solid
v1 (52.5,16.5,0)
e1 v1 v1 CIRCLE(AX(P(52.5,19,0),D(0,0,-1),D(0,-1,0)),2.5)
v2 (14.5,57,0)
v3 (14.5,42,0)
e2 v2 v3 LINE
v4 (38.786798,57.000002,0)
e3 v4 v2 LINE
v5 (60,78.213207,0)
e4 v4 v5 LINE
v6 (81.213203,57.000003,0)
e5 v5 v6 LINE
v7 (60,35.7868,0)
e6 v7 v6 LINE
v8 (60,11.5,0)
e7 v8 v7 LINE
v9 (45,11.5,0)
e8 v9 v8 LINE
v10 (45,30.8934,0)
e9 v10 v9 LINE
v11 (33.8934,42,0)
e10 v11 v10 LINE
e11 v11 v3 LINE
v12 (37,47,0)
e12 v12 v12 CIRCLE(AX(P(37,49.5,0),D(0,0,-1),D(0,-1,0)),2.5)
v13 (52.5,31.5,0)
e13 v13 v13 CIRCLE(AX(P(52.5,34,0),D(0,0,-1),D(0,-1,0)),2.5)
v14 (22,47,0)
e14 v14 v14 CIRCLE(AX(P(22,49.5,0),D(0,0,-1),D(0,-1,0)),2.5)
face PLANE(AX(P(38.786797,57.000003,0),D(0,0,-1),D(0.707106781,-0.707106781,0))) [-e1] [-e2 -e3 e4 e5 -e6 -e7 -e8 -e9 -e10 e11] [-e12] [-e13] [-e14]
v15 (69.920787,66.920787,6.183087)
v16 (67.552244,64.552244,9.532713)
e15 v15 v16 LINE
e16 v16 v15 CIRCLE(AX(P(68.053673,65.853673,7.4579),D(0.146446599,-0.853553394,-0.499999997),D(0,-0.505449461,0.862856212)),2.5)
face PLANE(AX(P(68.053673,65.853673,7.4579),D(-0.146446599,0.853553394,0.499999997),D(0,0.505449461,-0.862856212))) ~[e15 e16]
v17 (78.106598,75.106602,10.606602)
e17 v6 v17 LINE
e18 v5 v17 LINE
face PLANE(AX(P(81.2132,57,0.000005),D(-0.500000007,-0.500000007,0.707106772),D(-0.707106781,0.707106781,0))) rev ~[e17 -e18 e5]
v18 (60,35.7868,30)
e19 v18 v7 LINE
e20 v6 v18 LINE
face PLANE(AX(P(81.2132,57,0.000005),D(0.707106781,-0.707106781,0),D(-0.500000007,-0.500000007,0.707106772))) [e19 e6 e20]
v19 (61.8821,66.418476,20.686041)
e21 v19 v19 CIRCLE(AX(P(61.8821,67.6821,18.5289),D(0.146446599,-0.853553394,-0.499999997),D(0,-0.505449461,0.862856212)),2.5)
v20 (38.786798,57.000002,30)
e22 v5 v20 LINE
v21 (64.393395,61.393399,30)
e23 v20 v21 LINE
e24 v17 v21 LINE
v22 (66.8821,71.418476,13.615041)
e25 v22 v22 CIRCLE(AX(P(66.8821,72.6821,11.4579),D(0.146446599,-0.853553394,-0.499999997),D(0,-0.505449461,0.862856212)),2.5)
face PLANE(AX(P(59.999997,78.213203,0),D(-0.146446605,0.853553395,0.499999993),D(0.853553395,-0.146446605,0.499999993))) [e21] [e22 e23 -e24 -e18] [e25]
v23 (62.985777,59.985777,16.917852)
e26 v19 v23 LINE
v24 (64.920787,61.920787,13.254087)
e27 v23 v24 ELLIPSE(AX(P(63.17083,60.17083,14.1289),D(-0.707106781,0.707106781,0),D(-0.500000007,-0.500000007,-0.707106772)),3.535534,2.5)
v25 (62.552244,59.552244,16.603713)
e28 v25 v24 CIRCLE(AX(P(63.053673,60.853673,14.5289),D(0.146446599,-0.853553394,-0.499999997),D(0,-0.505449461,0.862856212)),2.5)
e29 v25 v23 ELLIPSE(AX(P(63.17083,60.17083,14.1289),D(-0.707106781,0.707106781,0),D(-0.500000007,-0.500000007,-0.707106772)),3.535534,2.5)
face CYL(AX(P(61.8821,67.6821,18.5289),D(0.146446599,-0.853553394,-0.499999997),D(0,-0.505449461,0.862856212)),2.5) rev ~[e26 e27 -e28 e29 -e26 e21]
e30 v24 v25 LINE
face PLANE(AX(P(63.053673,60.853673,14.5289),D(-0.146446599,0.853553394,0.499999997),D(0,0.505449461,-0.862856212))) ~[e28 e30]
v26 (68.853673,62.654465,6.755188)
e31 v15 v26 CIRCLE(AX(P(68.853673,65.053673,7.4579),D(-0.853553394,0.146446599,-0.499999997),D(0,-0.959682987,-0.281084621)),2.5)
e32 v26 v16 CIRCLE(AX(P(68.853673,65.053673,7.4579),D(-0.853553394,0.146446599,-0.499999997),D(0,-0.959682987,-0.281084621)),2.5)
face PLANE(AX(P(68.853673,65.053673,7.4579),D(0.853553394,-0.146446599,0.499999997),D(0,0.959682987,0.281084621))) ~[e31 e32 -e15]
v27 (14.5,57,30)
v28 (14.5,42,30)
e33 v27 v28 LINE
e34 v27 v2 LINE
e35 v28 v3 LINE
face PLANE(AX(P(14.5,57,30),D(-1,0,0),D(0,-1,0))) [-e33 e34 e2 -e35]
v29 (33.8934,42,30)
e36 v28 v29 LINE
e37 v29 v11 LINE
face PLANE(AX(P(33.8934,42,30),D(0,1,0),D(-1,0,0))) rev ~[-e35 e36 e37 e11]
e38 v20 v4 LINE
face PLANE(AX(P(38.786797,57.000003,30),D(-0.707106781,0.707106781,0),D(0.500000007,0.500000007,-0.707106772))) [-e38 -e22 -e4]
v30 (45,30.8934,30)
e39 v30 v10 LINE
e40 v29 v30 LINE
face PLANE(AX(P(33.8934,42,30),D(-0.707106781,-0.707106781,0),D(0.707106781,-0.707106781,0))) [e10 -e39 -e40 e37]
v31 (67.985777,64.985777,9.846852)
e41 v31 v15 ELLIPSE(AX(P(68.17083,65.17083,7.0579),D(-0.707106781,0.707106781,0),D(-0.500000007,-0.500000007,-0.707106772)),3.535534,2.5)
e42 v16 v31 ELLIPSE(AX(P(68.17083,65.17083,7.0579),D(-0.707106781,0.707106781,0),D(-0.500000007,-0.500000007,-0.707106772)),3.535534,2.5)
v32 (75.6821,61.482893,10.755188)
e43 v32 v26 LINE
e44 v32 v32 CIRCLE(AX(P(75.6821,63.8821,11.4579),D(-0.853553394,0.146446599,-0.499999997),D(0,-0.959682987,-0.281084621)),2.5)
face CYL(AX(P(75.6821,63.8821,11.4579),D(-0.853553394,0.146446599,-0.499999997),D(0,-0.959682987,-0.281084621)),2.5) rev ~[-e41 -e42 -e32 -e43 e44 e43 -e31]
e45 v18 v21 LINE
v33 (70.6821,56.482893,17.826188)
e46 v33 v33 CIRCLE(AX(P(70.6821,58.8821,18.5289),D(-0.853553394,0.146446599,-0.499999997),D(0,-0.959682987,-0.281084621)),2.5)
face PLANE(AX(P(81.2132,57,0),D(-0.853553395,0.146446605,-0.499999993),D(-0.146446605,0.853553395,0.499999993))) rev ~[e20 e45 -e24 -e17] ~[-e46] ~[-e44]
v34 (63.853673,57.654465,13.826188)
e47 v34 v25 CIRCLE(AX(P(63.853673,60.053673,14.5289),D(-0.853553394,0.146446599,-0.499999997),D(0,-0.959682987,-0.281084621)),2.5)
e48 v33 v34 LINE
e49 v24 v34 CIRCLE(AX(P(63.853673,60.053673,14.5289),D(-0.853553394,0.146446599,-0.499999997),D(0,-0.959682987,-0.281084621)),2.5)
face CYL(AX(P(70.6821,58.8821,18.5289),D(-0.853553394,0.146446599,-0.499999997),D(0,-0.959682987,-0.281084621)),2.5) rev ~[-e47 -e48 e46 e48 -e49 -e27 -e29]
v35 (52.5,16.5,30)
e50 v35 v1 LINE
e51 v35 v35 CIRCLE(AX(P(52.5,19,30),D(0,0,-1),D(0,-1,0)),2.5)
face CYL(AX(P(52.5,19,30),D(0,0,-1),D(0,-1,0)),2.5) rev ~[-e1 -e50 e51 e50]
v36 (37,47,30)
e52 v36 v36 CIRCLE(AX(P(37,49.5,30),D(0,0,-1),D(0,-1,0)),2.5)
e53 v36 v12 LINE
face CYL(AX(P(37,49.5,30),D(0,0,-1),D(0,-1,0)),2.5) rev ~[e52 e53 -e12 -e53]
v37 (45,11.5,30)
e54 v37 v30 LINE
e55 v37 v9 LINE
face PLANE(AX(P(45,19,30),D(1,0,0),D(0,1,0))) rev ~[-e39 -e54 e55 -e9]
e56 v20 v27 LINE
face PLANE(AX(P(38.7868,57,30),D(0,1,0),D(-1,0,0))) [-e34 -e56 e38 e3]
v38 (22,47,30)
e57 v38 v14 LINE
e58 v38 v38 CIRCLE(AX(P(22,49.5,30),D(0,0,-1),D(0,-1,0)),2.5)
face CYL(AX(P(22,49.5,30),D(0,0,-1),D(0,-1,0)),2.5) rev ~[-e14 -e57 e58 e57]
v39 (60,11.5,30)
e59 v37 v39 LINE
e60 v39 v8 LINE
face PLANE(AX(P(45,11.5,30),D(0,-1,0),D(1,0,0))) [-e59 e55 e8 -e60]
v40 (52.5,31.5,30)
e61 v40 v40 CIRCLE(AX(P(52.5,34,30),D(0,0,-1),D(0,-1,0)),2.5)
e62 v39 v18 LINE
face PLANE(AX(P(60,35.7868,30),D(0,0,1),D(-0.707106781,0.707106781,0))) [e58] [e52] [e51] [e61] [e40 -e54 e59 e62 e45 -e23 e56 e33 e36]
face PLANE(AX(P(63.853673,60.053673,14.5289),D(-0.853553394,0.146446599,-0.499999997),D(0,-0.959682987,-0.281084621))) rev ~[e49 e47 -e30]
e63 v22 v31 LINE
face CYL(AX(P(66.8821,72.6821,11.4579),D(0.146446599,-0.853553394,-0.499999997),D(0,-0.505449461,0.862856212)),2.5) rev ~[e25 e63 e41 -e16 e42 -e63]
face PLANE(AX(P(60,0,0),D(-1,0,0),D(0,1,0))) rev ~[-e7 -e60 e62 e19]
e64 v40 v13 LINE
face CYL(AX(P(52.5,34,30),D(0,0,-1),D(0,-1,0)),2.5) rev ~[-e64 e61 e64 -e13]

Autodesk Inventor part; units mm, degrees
ref_plane "YZ Plane" through (0, 0, 0) normal (1, 0, 0) x (0, 1, 0)
ref_plane "XZ Plane" through (0, 0, 0) normal (0, 1, 0) x (-1, 0, 0)
ref_plane "XY Plane" through (0, 0, 0) normal (0, 0, 1) x (1, 0, 0)
sketch "スケッチ1" plane through (0, 0, 0) normal (0, 0, 1) x (1, 0, 0)
  line L0 (0, 0) -> (60, 0)
  line L1 (60, 0) -> (60, 60)
  line L2 (60, 60) -> (0, 60)
  line L3 (0, 60) -> (0, 0)
  dimension "d0" = 60
  dimension "d1" = 60
extrude "押し出し1" add sketch "スケッチ1" along normal blind 30
sketch "スケッチ2" plane through (0, 0, 30) normal (0, 0, 1) x (1, 0, 0)
  line L0 (60, 0) -> (60, 60) projected
  line L1 (60, 60) -> (0, 60) projected
  point P0 (0, 0)
  point P1 (22, 49.5)
  point P2 (37, 49.5)
  point P3 (52.5, 34)
  point P4 (52.5, 19)
  dimension "d4" = 7.5
  dimension "d5" = 7.5
  dimension "d6" = 10.5
  dimension "d7" = 10.5
  dimension "d8" = 15
  dimension "d9" = 15
  dimension "d10" = 23
  dimension "d11" = 26
hole "穴1" at (22, 49.5, 30) at (37, 49.5, 30) at (52.5, 34, 30) at (52.5, 19, 30) direction (0, 0, -1) diameter 5 end through all
sketch "スケッチ3" plane through (0, 0, 30) normal (0, 0, 1) x (1, 0, 0)
  line L0 (22, 49.5) -> (37, 49.5)
  circle A0 centre (52.5, 34) radius 2.5 projected
  line L1 (37, 49.5) -> (52.5, 34)
  line L2 (52.5, 34) -> (52.5, 19)
  line L3 (22, 49.5) -> (22, 19)
  line L4 (22, 19) -> (52.5, 19)
  line L5 (60, 37.1066) -> (40.1066, 57)
  line L6 (40.1066, 57) -> (14.5, 57)
  line L7 (14.5, 57) -> (14.5, 11.5)
  line L8 (14.5, 11.5) -> (60, 11.5)
  line L9 (60, 11.5) -> (60, 37.1066)
  line L10 (14.5, 57) -> (44.5, 57)
  line L11 (44.5, 57) -> (44.5, 42)
  line L12 (44.5, 42) -> (14.5, 42)
  line L13 (14.5, 42) -> (14.5, 57)
  line L14 (60, 11.5) -> (45, 11.5)
  line L15 (45, 11.5) -> (45, 41.5)
  line L16 (45, 41.5) -> (60, 41.5)
  line L17 (60, 41.5) -> (60, 11.5)
  circle A1 centre (52.5, 19) radius 2.5 projected
  circle A2 centre (52.5, 34) radius 2.5 projected
  circle A3 centre (37, 49.5) radius 2.5 projected
  circle A4 centre (22, 49.5) radius 2.5 projected
  line L18 (60, 0) -> (60, 60) projected
  line L19 (60, 60) -> (0, 60) projected
  line L20 (0, 60) -> (0, 0) projected
  line L21 (0, 0) -> (60, 0) projected
  line L22 (14.5, 42) -> (45, 11.5)
  line L23 (24.0029, 51.8905) -> (54.5029, 21.3905)
  line L24 (38.7868, 57) -> (60, 35.7868)
  point P0 (52.5, 26.5)
  point P1 (45, 19)
  point P2 (22, 42)
  point P3 (39.2529, 36.6405)
  point P4 (45, 30.8934)
  point P5 (33.8934, 42)
  dimension "d19" = 7.5
  dimension "d20" = 7.5
  dimension "d21" = 7.5
  dimension "d22" = 30
  dimension "d23" = 30
  dimension "d50" = 7.5
  dimension "d52" = 30
extrude "押し出し2" cut sketch "スケッチ3" against normal blind 30 contours L12 L23 L15 L4 L22 L3 | L3 L22 L12 | L22 L4 L3 | L3 L4 L22 L8 L7 | L7 L8 L18 L21 L20 L19 L16 L5 L11 L10 L6 | L4 L15 L22 | L24 L6 L5 L11 | L11 L5 L16 L24 | L16 L5 L9 L24 | L5 L10 L11 | L16 L17 L5
sketch "スケッチ15" plane through (60, 35.7868, 0) normal (0.7071068, 0.7071068, 0) x (-0.7071068, 0.7071068, 0)
  line L0 (0, 30) -> (30, 30) projected
  line L1 (0, 0) -> (0, 30) projected
  line L2 (30, 0) -> (0, 0) projected
  line L3 (30, 30) -> (30, 0) projected
  point P0 (17.1213, 0)
extrude "押し出し11" add sketch "スケッチ15" along normal blind 30
sketch "スケッチ16" plane through (60, 35.7868, 30) normal (0.7071068, -0.7071068, 0) x (-0.7071068, -0.7071068, 0)
  line L0 (0, 30) -> (0, 0) projected
  line L1 (0, 30) -> (-30, 30) projected
  line L2 (-30, 0) -> (-30, 30) projected
  line L3 (0, 0) -> (-30, 0) projected
  line L4 (0, 0) -> (-30, 30)
  point P0 (67.7315, 30)
extrude "押し出し12" cut sketch "スケッチ16" against normal blind 30 contours L3 L2 L4
sketch "スケッチ18" plane through (60, 35.7868, 30) normal (0.5, 0.5, 0.7071068) x (0.7071068, -0.7071068, 0)
  line L0 (0, 42.4264) -> (0, 0) projected
  line L1 (0, 42.4264) -> (-30, 42.4264) projected
  line L2 (-30, 0) -> (-30, 42.4264) projected
  line L3 (0, 0) -> (-30, 0) projected
  point P0 (-17.1213, -26.6802)
extrude "押し出し13" add sketch "スケッチ18" along normal blind 30
sketch "スケッチ19" plane through (81.2132, 57, 0) normal (0.5, 0.5, -0.7071068) x (-0.5, -0.5, -0.7071068)
  line L0 (21.2132, 0) -> (0, 0) projected
  line L1 (0, 30) -> (-30, 30) projected
  line L2 (0, 0) -> (-30, 30)
  line L3 (-30, 30) -> (0, 30)
  line L4 (0, 0) -> (-30, 0) projected
  line L5 (0, 30) -> (-30, 0)
  line L6 (0, 0) -> (0, 30) projected
  line L7 (0, 30) -> (-30, 30) projected
  line L8 (-30, 0) -> (-30, 30) projected
  line L9 (0, 0) -> (-30, 0) projected
  point P0 (69.1066, 17.1213)
  point P1 (-15, 15)
extrude "押し出し14" cut sketch "スケッチ19" against normal through all contours L5 L2 L1 | L2 L5 L8 | L2 L4 L5
sketch "スケッチ20" plane through (0, 0, 30) normal (0, 0, 1) x (1, 0, 0)
  circle A0 centre (52.5, 19) radius 2.5 projected
  circle A1 centre (52.5, 34) radius 2.5 projected
  circle A2 centre (37, 49.5) radius 2.5 projected
  circle A3 centre (22, 49.5) radius 2.5 projected
  line L0 (60, 35.7868) -> (38.7868, 57) projected
  line L1 (38.7868, 57) -> (14.5, 57) projected
  line L2 (14.5, 57) -> (14.5, 42) projected
  line L3 (14.5, 42) -> (33.8934, 42) projected
  line L4 (33.8934, 42) -> (45, 30.8934) projected
  line L5 (45, 30.8934) -> (45, 11.5) projected
  line L6 (45, 11.5) -> (60, 11.5) projected
  line L7 (60, 11.5) -> (60, 35.7868) projected
  line L8 (38.7868, 57) -> (60, 78.2132) projected
  line L9 (38.7868, 57) -> (60, 78.2132)
  line L10 (60, 78.2132) -> (81.2132, 57)
  line L11 (81.2132, 57) -> (60, 35.7868)
  point P0 (0, 0)
extrude "押し出し15" cut sketch "スケッチ20" along normal blind 15 contours L0 L8 L10 L11
sketch "スケッチ23" plane through (81.2132, 57, 0) normal (0.8535534, -0.1464466, 0.5) x (0.5, 0.5, -0.7071068)
  line L0 (0, 21.2132) -> (0, 0) projected
  line L1 (-27.4264, 21.2132) -> (-42.4264, 0) projected
  line L2 (0, 0) -> (-27.4264, 0)
  line L3 (-27.4264, 0) -> (-27.4264, 21.2132)
  line L4 (-27.4264, 21.2132) -> (0, 21.2132)
  line L5 (0, 21.2132) -> (0, 0)
  point P0 (-69.1066, -36.7591)
  point P1 (-17.4264, 12.4132)
  point P2 (-7.4264, 12.4132)
  dimension "d71" = 10
  dimension "d72" = 10
  dimension "d93" = 8.8
  dimension "d94" = 8.8
hole "穴2" at (70.6821, 58.8821, 18.5289) at (75.6821, 63.8821, 11.4579) direction (-0.8535534, 0.1464466, -0.5) diameter 5 depth 8
sketch "スケッチ24" plane through (60, 78.2132, 0) normal (-0.1464466, 0.8535534, 0.5) x (0.8535534, -0.1464466, 0.5)
  line L0 (21.2132, -27.4264) -> (21.2132, -42.4264) projected
  line L1 (-15, -21.2132) -> (0, 0) projected
  line L2 (21.2132, -27.4264) -> (0, -27.4264)
  line L3 (0, -27.4264) -> (0, 0)
  line L4 (0, 0) -> (21.2132, 0)
  line L5 (21.2132, 0) -> (21.2132, -27.4264)
  point P0 (-39.7591, -69.1066)
  point P1 (12.4132, -17.4264)
  point P2 (12.4132, -7.4264)
  dimension "d82" = 10
  dimension "d83" = 10
  dimension "d95" = 8.8
  dimension "d96" = 8.8
hole "穴3" at (61.8821, 67.6821, 18.5289) at (66.8821, 72.6821, 11.4579) direction (0.1464466, -0.8535534, -0.5) diameter 5 depth 8
equation "\"d5\" = d4"
equation "\"d7\" = d6"
equation "\"d9\" = d8"
equation "\"d20\" = d19"
equation "\"d21\" = d20"
equation "\"d23\" = d22"
equation "\"d94\" = d93"
equation "\"d83\" = d82"
equation "\"d96\" = d95"
properties part number "EX-L-Connect"
